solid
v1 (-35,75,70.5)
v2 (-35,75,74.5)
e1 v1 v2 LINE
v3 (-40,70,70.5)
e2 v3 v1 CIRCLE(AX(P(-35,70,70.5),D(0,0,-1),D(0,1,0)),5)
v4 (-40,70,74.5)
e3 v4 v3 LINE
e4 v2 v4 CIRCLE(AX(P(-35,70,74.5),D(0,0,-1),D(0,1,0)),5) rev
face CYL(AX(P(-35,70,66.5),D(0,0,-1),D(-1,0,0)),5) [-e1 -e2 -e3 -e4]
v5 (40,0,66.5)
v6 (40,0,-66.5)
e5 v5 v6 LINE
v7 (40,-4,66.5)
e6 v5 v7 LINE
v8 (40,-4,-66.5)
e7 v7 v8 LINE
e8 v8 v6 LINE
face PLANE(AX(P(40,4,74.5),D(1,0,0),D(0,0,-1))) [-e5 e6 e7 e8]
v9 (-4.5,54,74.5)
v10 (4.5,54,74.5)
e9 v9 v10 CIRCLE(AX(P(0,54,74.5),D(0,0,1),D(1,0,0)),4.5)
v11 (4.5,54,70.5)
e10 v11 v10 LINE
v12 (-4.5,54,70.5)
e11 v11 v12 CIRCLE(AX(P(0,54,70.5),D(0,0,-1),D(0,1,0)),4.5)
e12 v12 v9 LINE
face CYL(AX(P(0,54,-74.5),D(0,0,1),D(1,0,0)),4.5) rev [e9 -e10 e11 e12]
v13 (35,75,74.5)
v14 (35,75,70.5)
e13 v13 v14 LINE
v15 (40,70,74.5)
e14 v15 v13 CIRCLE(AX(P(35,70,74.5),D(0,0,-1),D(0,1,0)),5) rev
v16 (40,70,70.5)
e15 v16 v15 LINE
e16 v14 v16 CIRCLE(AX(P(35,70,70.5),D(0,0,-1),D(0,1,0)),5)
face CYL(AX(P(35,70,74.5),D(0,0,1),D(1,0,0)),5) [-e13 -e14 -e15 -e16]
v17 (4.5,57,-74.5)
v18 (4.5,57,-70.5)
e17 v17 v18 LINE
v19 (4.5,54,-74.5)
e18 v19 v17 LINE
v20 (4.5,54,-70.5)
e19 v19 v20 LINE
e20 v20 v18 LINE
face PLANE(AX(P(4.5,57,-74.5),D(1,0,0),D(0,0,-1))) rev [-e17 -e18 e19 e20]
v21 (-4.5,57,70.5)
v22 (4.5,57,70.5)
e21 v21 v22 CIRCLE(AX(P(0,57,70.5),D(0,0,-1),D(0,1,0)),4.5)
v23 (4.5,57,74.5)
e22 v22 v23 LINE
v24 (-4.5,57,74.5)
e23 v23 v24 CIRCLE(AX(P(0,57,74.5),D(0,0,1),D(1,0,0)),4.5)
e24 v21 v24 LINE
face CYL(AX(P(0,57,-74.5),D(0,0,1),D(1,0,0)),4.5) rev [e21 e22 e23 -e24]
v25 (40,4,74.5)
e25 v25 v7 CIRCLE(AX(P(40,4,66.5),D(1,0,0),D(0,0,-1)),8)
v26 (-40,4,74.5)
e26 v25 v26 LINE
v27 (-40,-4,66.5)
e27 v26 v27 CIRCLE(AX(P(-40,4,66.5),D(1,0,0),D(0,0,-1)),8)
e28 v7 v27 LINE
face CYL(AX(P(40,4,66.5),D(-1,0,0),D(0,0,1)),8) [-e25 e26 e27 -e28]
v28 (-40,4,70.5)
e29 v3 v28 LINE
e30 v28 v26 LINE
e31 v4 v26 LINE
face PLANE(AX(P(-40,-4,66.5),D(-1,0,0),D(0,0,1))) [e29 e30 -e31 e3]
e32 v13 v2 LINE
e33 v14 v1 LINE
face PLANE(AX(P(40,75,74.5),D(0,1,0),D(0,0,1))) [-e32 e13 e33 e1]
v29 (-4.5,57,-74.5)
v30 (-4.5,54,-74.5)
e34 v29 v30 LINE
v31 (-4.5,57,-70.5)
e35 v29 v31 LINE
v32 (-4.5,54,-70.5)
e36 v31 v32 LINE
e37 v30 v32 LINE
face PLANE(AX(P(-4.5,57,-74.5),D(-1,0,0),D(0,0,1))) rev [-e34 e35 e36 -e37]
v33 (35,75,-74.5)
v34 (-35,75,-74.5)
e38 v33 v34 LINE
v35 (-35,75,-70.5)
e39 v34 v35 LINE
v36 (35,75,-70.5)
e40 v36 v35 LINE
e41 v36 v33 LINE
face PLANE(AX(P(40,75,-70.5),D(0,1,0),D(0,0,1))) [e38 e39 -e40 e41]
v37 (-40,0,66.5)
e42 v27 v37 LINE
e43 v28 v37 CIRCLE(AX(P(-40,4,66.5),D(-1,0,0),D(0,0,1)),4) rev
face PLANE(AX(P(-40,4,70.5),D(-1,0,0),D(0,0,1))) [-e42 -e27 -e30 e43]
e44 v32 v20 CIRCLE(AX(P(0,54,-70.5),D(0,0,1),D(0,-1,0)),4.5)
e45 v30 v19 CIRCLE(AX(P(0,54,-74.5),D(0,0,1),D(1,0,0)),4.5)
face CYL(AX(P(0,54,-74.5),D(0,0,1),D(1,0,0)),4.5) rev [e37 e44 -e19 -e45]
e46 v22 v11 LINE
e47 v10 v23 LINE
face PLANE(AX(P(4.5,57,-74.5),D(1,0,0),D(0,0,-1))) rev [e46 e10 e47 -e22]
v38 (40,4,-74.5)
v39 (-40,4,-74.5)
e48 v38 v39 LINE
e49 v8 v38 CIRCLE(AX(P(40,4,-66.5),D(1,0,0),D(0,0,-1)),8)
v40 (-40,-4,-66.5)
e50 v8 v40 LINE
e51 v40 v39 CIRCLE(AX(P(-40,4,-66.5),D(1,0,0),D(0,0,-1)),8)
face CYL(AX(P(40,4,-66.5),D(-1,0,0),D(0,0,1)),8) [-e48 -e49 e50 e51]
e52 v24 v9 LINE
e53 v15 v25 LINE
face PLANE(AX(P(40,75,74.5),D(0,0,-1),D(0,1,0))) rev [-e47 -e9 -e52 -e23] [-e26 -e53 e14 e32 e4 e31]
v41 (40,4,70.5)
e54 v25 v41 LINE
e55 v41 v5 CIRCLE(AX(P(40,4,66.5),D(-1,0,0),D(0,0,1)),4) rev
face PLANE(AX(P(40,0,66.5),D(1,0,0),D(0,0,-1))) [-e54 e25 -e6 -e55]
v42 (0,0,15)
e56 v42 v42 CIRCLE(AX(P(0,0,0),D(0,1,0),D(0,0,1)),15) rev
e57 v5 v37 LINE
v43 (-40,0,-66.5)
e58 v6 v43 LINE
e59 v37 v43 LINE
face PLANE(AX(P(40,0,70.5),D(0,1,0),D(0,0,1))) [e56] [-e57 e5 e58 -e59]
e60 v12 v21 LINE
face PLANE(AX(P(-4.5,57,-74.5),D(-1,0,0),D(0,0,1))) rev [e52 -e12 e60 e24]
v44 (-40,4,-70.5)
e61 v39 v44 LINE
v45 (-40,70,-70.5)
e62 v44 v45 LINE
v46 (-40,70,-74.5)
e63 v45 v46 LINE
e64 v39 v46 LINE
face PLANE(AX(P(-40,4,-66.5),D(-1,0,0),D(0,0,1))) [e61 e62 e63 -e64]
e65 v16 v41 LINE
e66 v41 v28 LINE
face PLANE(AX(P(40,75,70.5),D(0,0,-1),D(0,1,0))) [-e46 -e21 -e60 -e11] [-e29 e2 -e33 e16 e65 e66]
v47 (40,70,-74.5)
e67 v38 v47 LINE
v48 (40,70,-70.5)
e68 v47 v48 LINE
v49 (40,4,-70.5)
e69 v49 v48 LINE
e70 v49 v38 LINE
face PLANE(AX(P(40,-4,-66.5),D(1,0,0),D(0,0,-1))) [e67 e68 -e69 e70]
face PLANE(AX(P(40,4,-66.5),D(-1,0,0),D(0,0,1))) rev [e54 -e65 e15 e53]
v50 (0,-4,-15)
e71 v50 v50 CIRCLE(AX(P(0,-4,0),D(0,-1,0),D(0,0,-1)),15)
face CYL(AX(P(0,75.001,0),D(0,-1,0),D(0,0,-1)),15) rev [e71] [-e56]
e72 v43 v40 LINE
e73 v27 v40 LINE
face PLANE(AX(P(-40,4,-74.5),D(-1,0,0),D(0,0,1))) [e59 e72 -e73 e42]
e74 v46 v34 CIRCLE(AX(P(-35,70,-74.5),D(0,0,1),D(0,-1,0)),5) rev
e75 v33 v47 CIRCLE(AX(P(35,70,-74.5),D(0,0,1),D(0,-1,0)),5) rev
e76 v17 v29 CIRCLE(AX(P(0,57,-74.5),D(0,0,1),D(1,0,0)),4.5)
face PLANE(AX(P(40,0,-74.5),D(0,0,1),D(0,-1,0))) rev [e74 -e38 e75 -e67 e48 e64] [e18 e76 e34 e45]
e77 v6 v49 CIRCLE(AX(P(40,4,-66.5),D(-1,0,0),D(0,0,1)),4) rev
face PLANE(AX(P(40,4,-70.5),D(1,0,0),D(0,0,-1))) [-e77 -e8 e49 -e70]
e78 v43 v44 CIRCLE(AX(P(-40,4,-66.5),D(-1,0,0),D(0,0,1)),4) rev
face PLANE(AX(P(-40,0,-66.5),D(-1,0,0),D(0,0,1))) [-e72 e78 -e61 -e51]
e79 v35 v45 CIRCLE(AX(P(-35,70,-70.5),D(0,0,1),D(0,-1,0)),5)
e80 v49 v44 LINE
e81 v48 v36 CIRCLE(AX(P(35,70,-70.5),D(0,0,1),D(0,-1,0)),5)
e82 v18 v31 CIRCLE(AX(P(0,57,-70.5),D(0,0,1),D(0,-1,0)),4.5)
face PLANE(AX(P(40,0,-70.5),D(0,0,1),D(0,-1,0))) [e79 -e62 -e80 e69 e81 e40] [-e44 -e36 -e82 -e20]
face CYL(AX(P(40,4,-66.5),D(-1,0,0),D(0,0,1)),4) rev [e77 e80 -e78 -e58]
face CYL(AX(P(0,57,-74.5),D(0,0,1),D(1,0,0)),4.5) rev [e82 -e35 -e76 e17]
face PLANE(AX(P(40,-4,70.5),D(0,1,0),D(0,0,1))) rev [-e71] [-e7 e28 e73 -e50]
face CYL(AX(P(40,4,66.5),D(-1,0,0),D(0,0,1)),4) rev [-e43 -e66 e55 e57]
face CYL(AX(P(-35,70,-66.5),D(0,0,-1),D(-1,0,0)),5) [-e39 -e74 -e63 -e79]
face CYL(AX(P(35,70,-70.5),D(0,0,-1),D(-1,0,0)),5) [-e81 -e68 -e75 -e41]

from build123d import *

# Parameters (mm, degrees)
SM_BASE_FLANGE_1_DEPTH = 40
CUT_EXTRUDE_1_REACH    = 117.721
SKETCH_6_R             = 15
CUT_EXTRUDE_2_DEPTH    = 172.54008278
FILLET_1_R             = 5


# Sheet-metal steps are written as plain solids
with BuildPart() as part:
    # Sketch 1 → 基体-法兰1 (new, symmetric)
    with BuildSketch(Plane(origin=(0, 0, 0), x_dir=(0, 0, -1), z_dir=(1, 0, 0))):
        with BuildLine():
            Line((-70.5, 75), (-70.5, 4))
            ThreePointArc((-70.5, 4), (-69.328427125, 1.171572875), (-66.5, 0))
            Line((-66.5, 0), (66.5, 0))
            ThreePointArc((66.5, 0), (69.328427125, 1.171572875), (70.5, 4))
            Line((70.5, 4), (70.5, 75))
            Line((70.5, 75), (74.5, 75))
            Line((74.5, 75), (74.5, 4))
            ThreePointArc((74.5, 4), (72.156854249, -1.656854249), (66.5, -4))
            Line((66.5, -4), (-66.5, -4))
            ThreePointArc((-66.5, -4), (-72.156854249, -1.656854249), (-74.5, 4))
            Line((-74.5, 4), (-74.5, 75))
            Line((-74.5, 75), (-70.5, 75))
        make_face()
    extrude(amount=SM_BASE_FLANGE_1_DEPTH, both=True)

    # 草图6 → 切除-拉伸1 (cut, up to next)
    with BuildSketch(Plane.XZ.offset(4), mode=Mode.PRIVATE) as cut_extrude_1_sk1:
        with Locations(Location((0, 0, 0), (0, 0, 270))):
            Circle(SKETCH_6_R)
    cut_extrude_1_tool1 = extrude(cut_extrude_1_sk1.sketch, amount=-CUT_EXTRUDE_1_REACH, mode=Mode.PRIVATE) & part.part
    add(cut_extrude_1_tool1.solids().sort_by_distance((0, -4, 0))[0], mode=Mode.SUBTRACT)

    # 草图7 → 切除-拉伸2 (cut, through all)
    with BuildSketch(Plane.XY.offset(74.5)):
        with BuildLine():
            Line((4.5, 57), (4.5, 54))
            ThreePointArc((4.5, 54), (0, 49.5), (-4.5, 54))
            Line((-4.5, 54), (-4.5, 57))
            ThreePointArc((-4.5, 57), (0, 61.5), (4.5, 57))
        make_face()
    extrude(amount=-CUT_EXTRUDE_2_DEPTH, mode=Mode.SUBTRACT)

    # 圆角1
    fillet_1_edges = [part.edges().sort_by_distance(p)[0] for p in [
        (-40, 75, 72.5),
        (-40, 75, -72.5),
        (40, 75, 72.5),
        (40, 75, -72.5),
    ]]
    fillet(fillet_1_edges, radius=FILLET_1_R)


solid = part.part
